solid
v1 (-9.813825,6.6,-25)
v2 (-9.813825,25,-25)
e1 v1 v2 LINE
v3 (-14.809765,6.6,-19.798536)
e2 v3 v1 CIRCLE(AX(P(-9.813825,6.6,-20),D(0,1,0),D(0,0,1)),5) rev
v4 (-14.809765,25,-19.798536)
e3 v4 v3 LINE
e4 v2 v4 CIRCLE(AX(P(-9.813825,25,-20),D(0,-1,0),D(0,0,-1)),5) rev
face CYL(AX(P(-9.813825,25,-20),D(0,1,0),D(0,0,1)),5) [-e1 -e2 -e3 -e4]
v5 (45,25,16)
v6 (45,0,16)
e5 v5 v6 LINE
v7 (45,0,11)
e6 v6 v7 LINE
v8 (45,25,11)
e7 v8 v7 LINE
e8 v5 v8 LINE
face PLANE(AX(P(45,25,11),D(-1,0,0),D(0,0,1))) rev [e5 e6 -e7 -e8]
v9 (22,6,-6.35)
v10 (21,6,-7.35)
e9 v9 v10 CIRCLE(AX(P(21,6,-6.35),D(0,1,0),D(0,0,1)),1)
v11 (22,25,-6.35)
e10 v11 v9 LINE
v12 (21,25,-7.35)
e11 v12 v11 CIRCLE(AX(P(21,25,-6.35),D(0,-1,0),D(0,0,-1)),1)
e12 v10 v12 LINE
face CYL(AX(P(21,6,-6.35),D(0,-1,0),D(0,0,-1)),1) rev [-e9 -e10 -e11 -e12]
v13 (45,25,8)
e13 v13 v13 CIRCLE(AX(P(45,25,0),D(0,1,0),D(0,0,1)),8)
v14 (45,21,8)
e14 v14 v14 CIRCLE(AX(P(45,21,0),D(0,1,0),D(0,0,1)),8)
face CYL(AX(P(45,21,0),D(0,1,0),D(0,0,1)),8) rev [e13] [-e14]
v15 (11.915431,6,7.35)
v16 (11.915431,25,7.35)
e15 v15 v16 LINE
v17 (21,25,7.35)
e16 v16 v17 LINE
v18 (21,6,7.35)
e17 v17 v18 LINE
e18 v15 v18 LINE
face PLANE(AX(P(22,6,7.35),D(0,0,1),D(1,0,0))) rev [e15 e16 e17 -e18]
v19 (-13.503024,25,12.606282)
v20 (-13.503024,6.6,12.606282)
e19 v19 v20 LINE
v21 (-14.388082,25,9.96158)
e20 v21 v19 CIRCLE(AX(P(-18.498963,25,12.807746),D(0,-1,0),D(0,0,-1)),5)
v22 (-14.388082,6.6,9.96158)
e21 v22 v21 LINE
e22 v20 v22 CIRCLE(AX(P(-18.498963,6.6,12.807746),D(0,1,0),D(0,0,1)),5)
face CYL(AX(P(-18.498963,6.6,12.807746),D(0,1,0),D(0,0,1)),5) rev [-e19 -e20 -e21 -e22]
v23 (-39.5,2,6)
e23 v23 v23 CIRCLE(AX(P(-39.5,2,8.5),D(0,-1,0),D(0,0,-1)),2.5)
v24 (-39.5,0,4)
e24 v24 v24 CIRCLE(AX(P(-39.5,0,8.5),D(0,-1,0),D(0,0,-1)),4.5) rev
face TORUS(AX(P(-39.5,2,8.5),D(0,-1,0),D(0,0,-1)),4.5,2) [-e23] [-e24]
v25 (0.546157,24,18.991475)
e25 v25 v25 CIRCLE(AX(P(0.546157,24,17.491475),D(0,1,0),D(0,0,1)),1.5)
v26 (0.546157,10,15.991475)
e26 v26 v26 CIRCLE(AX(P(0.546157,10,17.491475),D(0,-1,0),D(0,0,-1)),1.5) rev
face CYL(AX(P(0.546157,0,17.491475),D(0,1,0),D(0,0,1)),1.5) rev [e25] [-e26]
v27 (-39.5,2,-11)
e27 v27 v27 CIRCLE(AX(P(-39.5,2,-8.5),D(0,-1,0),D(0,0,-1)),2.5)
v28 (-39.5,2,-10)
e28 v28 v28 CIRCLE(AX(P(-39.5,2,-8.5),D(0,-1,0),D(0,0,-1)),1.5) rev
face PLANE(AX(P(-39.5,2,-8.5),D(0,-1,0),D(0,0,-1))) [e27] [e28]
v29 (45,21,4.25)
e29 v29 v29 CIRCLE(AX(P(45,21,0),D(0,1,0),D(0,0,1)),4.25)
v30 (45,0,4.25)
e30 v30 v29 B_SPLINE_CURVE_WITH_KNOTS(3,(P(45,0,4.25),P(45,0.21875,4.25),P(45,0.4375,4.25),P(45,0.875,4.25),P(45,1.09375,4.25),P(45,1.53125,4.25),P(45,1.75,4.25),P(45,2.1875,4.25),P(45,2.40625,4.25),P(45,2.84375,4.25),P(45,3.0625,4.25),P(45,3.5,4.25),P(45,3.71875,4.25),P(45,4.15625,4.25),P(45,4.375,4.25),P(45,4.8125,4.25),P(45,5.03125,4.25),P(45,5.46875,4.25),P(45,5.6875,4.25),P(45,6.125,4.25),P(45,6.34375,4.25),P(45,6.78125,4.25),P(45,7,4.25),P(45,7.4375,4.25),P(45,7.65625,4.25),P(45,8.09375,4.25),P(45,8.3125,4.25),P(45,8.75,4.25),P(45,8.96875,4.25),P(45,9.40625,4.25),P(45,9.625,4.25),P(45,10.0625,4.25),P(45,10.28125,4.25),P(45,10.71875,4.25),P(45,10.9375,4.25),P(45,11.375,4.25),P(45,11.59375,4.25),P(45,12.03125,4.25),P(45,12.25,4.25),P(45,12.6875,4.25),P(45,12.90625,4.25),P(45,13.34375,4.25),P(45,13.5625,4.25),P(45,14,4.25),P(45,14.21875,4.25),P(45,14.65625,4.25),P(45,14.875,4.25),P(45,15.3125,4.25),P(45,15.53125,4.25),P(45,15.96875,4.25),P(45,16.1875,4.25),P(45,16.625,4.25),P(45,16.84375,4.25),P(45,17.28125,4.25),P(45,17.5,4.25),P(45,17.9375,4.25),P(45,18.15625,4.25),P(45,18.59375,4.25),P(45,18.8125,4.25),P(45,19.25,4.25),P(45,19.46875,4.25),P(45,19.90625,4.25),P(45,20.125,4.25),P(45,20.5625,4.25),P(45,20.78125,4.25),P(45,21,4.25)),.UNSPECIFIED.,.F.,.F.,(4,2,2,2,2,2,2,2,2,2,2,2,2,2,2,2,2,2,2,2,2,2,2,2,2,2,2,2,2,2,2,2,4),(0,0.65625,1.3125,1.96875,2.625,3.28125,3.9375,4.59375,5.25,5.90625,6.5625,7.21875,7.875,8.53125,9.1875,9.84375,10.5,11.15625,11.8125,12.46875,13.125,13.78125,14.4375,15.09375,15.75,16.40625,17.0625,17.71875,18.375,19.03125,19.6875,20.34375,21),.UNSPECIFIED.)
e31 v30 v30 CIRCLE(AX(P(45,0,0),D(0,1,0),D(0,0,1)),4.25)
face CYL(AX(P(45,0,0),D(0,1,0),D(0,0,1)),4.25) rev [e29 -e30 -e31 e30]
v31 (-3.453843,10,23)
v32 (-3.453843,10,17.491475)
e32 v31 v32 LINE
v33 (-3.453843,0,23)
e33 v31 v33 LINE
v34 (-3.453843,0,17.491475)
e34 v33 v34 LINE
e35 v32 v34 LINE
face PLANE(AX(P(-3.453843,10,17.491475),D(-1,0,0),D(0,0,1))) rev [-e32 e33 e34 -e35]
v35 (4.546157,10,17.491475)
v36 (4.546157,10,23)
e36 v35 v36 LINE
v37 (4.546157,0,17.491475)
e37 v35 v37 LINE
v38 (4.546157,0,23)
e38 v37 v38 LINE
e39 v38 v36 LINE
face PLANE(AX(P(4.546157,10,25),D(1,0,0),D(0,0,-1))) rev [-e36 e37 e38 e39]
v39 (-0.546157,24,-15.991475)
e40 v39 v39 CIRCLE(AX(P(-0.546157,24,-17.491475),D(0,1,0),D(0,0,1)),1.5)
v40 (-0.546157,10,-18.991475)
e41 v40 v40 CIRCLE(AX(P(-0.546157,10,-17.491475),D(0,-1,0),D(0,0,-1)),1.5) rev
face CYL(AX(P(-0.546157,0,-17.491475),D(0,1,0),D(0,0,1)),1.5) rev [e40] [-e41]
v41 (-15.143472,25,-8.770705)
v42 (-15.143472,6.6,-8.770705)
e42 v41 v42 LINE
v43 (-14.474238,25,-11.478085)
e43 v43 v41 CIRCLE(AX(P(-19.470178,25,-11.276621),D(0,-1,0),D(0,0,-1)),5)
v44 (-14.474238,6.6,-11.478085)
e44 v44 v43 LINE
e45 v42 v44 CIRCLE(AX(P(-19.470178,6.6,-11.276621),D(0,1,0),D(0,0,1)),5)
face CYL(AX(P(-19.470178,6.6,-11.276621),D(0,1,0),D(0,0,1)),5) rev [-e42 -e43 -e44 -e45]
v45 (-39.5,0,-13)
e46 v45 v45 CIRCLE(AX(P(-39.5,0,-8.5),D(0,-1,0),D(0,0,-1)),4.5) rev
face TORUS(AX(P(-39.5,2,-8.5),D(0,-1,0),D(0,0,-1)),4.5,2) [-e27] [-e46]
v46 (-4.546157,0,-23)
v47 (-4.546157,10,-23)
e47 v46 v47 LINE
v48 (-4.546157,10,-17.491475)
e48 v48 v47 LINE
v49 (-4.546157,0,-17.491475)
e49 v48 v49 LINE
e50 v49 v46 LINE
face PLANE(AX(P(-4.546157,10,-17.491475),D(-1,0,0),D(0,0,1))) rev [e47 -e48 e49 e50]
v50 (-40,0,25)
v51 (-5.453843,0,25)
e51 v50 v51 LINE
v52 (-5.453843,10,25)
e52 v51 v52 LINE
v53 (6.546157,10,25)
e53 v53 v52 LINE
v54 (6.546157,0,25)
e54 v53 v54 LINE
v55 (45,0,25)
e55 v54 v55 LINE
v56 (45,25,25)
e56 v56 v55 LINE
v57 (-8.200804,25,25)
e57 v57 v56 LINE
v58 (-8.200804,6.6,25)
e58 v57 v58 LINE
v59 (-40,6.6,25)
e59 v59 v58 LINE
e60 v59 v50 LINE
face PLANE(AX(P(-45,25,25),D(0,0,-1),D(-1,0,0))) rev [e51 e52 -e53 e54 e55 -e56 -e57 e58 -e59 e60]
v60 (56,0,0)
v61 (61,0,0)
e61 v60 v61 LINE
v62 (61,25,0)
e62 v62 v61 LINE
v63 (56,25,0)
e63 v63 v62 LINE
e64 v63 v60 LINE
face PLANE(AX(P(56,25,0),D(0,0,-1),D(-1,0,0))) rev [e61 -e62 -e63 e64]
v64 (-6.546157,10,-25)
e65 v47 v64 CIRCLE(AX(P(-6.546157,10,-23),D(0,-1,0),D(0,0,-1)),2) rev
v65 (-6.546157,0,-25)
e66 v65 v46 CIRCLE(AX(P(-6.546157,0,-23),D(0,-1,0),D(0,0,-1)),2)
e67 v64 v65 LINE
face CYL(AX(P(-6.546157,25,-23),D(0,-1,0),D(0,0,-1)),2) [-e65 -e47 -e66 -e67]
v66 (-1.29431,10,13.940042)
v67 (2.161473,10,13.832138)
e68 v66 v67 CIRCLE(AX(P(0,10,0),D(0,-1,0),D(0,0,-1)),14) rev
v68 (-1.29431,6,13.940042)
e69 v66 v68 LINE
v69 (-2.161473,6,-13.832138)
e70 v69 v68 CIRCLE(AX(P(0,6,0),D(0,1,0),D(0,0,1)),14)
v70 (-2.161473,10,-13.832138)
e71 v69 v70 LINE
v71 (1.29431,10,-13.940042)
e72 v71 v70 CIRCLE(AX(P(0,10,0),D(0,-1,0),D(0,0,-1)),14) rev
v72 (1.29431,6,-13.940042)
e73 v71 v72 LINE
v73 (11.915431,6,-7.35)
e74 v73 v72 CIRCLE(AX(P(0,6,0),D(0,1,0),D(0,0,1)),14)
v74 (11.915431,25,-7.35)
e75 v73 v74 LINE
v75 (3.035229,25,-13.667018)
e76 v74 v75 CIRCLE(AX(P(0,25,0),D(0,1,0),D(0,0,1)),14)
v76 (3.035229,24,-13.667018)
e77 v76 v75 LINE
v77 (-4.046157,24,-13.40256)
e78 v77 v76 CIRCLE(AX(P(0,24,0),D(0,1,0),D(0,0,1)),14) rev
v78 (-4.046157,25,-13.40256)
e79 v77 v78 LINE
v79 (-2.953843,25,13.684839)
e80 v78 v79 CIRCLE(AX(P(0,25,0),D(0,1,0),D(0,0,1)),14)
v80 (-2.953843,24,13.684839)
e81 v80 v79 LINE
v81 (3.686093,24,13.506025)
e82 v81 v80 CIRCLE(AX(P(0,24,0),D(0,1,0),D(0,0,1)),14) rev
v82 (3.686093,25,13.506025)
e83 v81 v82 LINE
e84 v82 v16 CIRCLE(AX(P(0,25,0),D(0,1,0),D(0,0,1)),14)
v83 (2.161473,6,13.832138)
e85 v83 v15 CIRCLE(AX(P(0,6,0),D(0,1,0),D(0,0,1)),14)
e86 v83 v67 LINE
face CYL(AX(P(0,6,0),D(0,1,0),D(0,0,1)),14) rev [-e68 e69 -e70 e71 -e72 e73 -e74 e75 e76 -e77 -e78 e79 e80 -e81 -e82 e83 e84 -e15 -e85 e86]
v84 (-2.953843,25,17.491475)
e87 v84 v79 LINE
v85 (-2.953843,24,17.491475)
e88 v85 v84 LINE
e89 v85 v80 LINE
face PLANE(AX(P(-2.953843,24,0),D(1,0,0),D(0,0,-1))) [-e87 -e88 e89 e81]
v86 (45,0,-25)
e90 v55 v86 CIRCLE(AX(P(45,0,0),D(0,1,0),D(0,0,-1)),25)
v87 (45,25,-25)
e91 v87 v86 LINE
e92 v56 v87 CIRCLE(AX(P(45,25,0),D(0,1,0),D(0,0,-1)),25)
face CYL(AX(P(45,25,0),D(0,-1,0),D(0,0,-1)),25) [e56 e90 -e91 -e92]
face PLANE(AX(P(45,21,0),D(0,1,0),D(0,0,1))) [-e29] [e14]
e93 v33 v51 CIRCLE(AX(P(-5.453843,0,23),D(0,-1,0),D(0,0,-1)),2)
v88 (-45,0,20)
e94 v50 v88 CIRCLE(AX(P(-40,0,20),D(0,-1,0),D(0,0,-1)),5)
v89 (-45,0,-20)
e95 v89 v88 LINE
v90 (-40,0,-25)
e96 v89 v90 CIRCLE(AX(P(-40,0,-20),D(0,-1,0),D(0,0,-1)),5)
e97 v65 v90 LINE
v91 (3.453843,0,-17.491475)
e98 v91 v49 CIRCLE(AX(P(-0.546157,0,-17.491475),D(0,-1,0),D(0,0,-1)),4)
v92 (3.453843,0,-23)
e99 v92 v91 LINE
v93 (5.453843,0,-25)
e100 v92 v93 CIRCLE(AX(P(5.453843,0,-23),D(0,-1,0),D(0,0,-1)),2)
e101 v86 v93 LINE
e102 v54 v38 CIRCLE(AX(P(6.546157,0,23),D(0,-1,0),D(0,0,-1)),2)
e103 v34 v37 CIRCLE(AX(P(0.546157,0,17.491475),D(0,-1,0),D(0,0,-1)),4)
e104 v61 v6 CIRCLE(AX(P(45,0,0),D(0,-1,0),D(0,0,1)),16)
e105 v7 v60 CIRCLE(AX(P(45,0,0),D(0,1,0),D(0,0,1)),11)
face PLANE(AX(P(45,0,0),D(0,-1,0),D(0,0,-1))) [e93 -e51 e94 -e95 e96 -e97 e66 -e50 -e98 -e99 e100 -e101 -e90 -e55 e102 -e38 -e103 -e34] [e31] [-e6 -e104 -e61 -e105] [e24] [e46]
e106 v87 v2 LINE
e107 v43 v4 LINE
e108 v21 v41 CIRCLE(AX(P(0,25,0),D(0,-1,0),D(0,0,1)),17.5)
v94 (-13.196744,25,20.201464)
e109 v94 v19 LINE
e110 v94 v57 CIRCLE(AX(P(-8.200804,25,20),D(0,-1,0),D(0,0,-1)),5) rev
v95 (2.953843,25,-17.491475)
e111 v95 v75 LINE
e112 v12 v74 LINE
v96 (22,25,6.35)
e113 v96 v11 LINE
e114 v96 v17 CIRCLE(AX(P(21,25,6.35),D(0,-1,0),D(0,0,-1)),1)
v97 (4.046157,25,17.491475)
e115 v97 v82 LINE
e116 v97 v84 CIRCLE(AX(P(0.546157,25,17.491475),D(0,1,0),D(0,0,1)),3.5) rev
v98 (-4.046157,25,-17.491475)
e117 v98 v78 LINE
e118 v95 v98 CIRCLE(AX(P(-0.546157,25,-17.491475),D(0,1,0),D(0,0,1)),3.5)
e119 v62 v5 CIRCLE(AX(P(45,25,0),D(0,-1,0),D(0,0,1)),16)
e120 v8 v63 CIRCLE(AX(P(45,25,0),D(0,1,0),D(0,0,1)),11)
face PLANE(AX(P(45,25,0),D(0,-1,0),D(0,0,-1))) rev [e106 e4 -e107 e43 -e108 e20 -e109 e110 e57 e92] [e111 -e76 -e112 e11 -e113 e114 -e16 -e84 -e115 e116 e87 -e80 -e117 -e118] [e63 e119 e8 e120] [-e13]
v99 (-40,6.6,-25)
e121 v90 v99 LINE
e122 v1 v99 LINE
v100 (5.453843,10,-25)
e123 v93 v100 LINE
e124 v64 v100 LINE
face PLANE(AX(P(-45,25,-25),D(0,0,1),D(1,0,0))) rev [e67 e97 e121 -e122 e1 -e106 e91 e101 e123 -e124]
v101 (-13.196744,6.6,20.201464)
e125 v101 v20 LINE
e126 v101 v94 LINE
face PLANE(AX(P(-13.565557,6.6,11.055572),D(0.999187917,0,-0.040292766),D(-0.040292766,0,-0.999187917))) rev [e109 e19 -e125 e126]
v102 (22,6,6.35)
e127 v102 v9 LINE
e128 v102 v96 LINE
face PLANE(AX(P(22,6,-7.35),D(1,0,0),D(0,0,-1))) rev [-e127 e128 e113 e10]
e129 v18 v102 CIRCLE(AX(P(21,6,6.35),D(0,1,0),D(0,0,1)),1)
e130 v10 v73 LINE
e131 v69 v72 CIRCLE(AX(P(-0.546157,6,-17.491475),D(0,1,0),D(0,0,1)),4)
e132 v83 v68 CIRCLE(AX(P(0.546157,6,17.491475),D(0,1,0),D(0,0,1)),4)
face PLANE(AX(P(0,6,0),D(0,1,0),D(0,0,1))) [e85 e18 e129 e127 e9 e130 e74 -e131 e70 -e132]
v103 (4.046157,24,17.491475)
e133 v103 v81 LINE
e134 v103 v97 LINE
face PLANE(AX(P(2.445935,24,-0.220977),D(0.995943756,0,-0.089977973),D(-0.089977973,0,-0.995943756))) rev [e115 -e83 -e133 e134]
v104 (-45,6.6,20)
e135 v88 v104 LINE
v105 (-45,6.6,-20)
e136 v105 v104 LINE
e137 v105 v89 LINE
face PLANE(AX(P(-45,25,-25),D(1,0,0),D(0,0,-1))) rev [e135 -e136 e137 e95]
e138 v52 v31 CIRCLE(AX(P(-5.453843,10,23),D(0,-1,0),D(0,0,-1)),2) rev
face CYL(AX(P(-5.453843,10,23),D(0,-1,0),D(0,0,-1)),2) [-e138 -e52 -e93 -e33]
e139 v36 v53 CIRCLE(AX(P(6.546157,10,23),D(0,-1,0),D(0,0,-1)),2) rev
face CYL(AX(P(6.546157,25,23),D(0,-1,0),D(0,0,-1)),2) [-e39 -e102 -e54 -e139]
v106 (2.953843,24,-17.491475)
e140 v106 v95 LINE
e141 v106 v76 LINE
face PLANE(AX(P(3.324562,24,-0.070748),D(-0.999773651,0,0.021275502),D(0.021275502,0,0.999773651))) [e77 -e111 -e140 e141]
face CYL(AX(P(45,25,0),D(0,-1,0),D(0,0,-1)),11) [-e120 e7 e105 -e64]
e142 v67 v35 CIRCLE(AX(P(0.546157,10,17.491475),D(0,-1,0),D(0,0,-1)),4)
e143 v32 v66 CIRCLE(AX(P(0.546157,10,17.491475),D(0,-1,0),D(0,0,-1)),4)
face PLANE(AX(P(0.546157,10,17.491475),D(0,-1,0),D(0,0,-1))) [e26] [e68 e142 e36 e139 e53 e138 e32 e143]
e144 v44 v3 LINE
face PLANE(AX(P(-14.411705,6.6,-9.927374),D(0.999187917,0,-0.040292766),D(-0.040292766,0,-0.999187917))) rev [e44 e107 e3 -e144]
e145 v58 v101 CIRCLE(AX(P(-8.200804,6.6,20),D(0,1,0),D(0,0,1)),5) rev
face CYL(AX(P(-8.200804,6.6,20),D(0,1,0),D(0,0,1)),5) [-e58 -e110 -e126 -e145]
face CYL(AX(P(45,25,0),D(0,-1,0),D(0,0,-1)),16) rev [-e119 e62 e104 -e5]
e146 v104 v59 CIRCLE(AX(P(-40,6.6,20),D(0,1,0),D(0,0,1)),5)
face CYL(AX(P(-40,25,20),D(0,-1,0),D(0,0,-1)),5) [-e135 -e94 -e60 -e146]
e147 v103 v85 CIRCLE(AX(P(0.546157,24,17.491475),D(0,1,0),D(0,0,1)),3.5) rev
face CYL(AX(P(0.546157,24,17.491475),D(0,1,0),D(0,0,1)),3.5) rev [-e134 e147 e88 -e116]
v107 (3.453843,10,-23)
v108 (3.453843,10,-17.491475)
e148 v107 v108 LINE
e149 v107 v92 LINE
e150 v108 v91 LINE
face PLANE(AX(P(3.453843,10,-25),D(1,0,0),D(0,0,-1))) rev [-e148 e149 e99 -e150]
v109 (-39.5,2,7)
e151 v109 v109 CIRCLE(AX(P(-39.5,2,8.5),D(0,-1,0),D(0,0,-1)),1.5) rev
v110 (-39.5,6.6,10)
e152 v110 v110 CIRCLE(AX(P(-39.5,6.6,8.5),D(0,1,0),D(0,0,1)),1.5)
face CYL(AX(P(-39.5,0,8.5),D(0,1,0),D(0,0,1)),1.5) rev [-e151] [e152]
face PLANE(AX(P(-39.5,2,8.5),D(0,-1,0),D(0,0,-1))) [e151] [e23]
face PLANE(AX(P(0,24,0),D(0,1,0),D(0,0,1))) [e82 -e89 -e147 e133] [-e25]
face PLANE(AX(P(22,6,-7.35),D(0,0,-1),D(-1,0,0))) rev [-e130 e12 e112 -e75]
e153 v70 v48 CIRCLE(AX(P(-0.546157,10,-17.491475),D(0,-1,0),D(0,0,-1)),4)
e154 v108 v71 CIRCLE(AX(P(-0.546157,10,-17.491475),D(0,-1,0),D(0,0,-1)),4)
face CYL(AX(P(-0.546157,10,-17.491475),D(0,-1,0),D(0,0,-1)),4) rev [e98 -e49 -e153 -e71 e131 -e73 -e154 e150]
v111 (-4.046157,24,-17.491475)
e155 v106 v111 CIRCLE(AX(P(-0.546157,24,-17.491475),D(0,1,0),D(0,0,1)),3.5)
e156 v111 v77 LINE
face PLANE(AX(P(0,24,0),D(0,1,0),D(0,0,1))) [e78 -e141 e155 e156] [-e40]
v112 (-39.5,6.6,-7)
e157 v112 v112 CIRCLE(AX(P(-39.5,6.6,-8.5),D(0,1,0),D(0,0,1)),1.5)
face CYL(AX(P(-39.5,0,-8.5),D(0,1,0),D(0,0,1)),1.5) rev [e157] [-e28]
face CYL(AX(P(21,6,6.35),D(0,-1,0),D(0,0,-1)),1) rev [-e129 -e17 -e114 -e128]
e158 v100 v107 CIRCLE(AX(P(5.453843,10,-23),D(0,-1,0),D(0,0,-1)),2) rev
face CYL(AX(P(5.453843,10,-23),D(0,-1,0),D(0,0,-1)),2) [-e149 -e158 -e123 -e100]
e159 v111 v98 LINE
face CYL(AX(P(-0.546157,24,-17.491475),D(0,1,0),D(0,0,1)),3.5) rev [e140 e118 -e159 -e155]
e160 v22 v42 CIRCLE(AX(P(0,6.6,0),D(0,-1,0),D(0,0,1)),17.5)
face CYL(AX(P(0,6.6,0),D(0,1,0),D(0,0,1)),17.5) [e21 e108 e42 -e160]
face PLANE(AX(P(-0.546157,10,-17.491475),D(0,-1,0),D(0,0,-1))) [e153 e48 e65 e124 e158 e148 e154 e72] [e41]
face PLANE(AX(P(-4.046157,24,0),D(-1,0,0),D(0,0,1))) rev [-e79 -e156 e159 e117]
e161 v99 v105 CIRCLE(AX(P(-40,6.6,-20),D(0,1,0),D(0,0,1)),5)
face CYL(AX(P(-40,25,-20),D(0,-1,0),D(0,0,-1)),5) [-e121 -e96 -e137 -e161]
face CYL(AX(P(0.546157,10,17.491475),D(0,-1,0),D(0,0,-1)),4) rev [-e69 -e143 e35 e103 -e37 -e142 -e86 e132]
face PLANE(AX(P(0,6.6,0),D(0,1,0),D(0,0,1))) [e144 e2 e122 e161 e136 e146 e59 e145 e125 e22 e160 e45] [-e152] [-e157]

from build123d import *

# Parameters (mm, degrees)
BOSS_EXTRUDE1_DEPTH = 25
SKETCH2_R           = 14
CUT_EXTRUDE1_DEPTH  = 19
CUT_EXTRUDE2_DEPTH  = 1
SKETCH4_R           = 1.5
CUT_EXTRUDE3_DEPTH  = 79.108898341
SKETCH5_R           = 1.5
CUT_EXTRUDE4_DEPTH  = 79.108898341
CUT_EXTRUDE7_DEPTH  = 19
FILLET1_R           = 1
CUT_EXTRUDE8_DEPTH  = 18.4
FILLET2_R           = 5
SKETCH8_R           = 1.5
CUT_EXTRUDE9_DEPTH  = 77.573885888
SKETCH9_R           = 2.5
CUT_EXTRUDE10_DEPTH = 2
FILLET3_R           = 2
CUT_EXTRUDE11_DEPTH = 10
FILLET4_R           = 2
SKETCH11_R          = 8
CUT_EXTRUDE12_DEPTH = 4
SKETCH12_R          = 4.25
CUT_EXTRUDE13_DEPTH = 78.239886096
CUT_EXTRUDE16_DEPTH = 25


with BuildPart() as part:
    # Sketch1 → Boss-Extrude1 (new body)
    with BuildSketch(Plane(origin=(0, 0, 0), x_dir=(1, 0, 0), z_dir=(0, 1, 0))):
        with BuildLine():
            Line((-45, 25), (45, 25))
            ThreePointArc((45, 25), (70, 0), (45, -25))
            Line((45, -25), (-45, -25))
            Line((-45, -25), (-45, 25))
        make_face()
    extrude(amount=BOSS_EXTRUDE1_DEPTH)

    # Sketch2 → Cut-Extrude1 (cut)
    with BuildSketch(Plane(origin=(0, 25, 0), x_dir=(1, 0, 0), z_dir=(0, 1, 0))):
        with Locations(Location((0, 0, 0), (0, 0, 270))):
            Circle(SKETCH2_R)
    extrude(amount=-CUT_EXTRUDE1_DEPTH, mode=Mode.SUBTRACT)

    # Sketch3 → Cut-Extrude2 (cut)
    with BuildSketch(Plane(origin=(0, 25, 0), x_dir=(1, 0, 0), z_dir=(0, 1, 0))):
        with BuildLine():
            ThreePointArc((2.953843371, 17.491475436), (-0.546156629, 20.991475436), (-4.046156629, 17.491475436))
            Line((-4.046156629, 17.491475436), (-4.046156629, 13.402560074))
            ThreePointArc((-4.046156629, 13.402560074), (-0.522473122, 13.990247383), (3.035229041, 13.667018134))
            Line((3.035229041, 13.667018134), (2.953843371, 17.491475436))
        make_face()
        with BuildLine():
            Line((-2.953843371, -13.684838667), (-2.953843371, -17.491475436))
            ThreePointArc((-2.953843371, -17.491475436), (0.546156629, -20.991475436), (4.046156629, -17.491475436))
            Line((4.046156629, -17.491475436), (3.686093385, -13.506025158))
            ThreePointArc((3.686093385, -13.506025158), (0.376883388, -13.994926185), (-2.953843371, -13.684838667))
        make_face()
    extrude(amount=-CUT_EXTRUDE2_DEPTH, mode=Mode.SUBTRACT)

    # Sketch4 → Cut-Extrude3 (cut, through all)
    with BuildSketch(Plane(origin=(0, 24, 0), x_dir=(1, 0, 0), z_dir=(0, 1, 0))):
        with Locations(Location((-0.546156629, 17.491475436, 0), (0, 0, 270))):
            Circle(SKETCH4_R)
    extrude(amount=-CUT_EXTRUDE3_DEPTH, mode=Mode.SUBTRACT)

    # Sketch5 → Cut-Extrude4 (cut, through all)
    with BuildSketch(Plane(origin=(0, 24, 0), x_dir=(1, 0, 0), z_dir=(0, 1, 0))):
        with Locations(Location((0.546156629, -17.491475436, 0), (0, 0, 270))):
            Circle(SKETCH5_R)
    extrude(amount=-CUT_EXTRUDE4_DEPTH, mode=Mode.SUBTRACT)

    # Sketch6 → Cut-Extrude7 (cut)
    with BuildSketch(Plane(origin=(0, 25, 0), x_dir=(1, 0, 0), z_dir=(0, 1, 0))):
        with BuildLine():
            Line((22, 7.35), (22, -7.35))
            Line((22, -7.35), (11.915431171, -7.35))
            Line((11.915431171, -7.35), (11.920287143, -7.342121929))
            ThreePointArc((11.920287143, -7.342121929), (13.999999235, 0.004627215), (11.915431171, 7.35))
            Line((11.915431171, 7.35), (22, 7.35))
        make_face()
    extrude(amount=-CUT_EXTRUDE7_DEPTH, mode=Mode.SUBTRACT)

    # Fillet1
    fillet1_edges = [part.edges().sort_by_distance(p)[0] for p in [
        (22, 15.5, 7.35),
        (22, 15.5, -7.35),
    ]]
    fillet(fillet1_edges, radius=FILLET1_R)

    # Sketch7 → Cut-Extrude8 (cut)
    with BuildSketch(Plane(origin=(0, 25, 0), x_dir=(1, 0, 0), z_dir=(0, 1, 0))):
        with BuildLine():
            Line((-14.411704874, 9.927374408), (-15.019516237, 25))
            Line((-15.019516237, 25), (-45, 25))
            Line((-45, 25), (-45, -25))
            Line((-45, -25), (-13.003240573, -25))
            Line((-13.003240573, -25), (-13.565556796, -11.055571845))
            ThreePointArc((-13.565556796, -11.055571845), (-17.485788544, -0.705123398), (-14.411704874, 9.927374408))
        make_face()
    extrude(amount=-CUT_EXTRUDE8_DEPTH, mode=Mode.SUBTRACT)

    # Fillet2
    fillet2_edges = [part.edges().sort_by_distance(p)[0] for p in [
        (-45, 3.3, 25),
        (-45, 3.3, -25),
        (-14.411704874, 15.8, -9.927374408),
        (-13.565556796, 15.8, 11.055571845),
        (-13.003240573, 15.8, 25),
        (-15.019516237, 15.8, -25),
    ]]
    fillet(fillet2_edges, radius=FILLET2_R)

    # Sketch8 → Cut-Extrude9 (cut, through all)
    with BuildSketch(Plane(origin=(0, 6.6, 0), x_dir=(1, 0, 0), z_dir=(0, 1, 0))):
        with Locations(Location((-39.5, 8.5, 0), (0, 0, 270))):
            Circle(SKETCH8_R)
        with Locations(Location((-39.5, -8.5, 0), (0, 0, 270))):
            Circle(SKETCH8_R)
    extrude(amount=-CUT_EXTRUDE9_DEPTH, mode=Mode.SUBTRACT)

    # Sketch9 → Cut-Extrude10 (cut)
    with BuildSketch(Plane.XZ):
        with Locations(Location((-39.5, 8.5, 0), (0, 0, 270))):
            Circle(SKETCH9_R)
        with Locations(Location((-39.5, -8.5, 0), (0, 0, 270))):
            Circle(SKETCH9_R)
    extrude(amount=-CUT_EXTRUDE10_DEPTH, mode=Mode.SUBTRACT)

    # Fillet3
    fillet3_edges = [part.edges().sort_by_distance(p)[0] for p in [
        (-39.5, 0, 11),
        (-39.5, 0, -6),
    ]]
    fillet(fillet3_edges, radius=FILLET3_R - 0.0001)  # a hair under: the kernel refuses the full size

    # Sketch10 → Cut-Extrude11 (cut)
    with BuildSketch(Plane.XZ):
        with BuildLine():
            Line((-3.453843371, 17.491475436), (-3.453843371, 25))
            Line((-3.453843371, 25), (4.546156629, 25))
            Line((4.546156629, 25), (4.546156629, 17.491475436))
            ThreePointArc((4.546156629, 17.491475436), (0.546156629, 13.491475436), (-3.453843371, 17.491475436))
        make_face()
        with BuildLine():
            Line((-4.546156629, -17.491475436), (-4.546156629, -25))
            Line((-4.546156629, -25), (3.453843371, -25))
            Line((3.453843371, -25), (3.453843371, -17.491475436))
            ThreePointArc((3.453843371, -17.491475436), (-0.546156629, -13.491475436), (-4.546156629, -17.491475436))
        make_face()
    extrude(amount=-CUT_EXTRUDE11_DEPTH, mode=Mode.SUBTRACT)

    # Fillet4
    fillet4_edges = [part.edges().sort_by_distance(p)[0] for p in [
        (-3.453843371, 5, 25),
        (4.546156629, 5, 25),
        (3.453843371, 5, -25),
        (-4.546156629, 5, -25),
    ]]
    fillet(fillet4_edges, radius=FILLET4_R)

    # Sketch11 → Cut-Extrude12 (cut)
    with BuildSketch(Plane(origin=(0, 25, 0), x_dir=(1, 0, 0), z_dir=(0, 1, 0))):
        with Locations(Location((45, 0, 0), (0, 0, 270))):
            Circle(SKETCH11_R)
    extrude(amount=-CUT_EXTRUDE12_DEPTH, mode=Mode.SUBTRACT)

    # Sketch12 → Cut-Extrude13 (cut, through all)
    with BuildSketch(Plane(origin=(0, 21, 0), x_dir=(1, 0, 0), z_dir=(0, 1, 0))):
        with Locations(Location((45, 0, 0), (0, 0, 270))):
            Circle(SKETCH12_R)
    extrude(amount=-CUT_EXTRUDE13_DEPTH, mode=Mode.SUBTRACT)

    # Sketch19 → Cut-Extrude16 (cut)
    with BuildSketch(Plane.XZ):
        with BuildLine():
            Line((45, 11), (45, 16))
            ThreePointArc((45, 16), (56.313708499, 11.313708499), (61, 0))
            Line((61, 0), (56, 0))
            ThreePointArc((56, 0), (52.778174593, 7.778174593), (45, 11))
        make_face()
    extrude(amount=-CUT_EXTRUDE16_DEPTH, mode=Mode.SUBTRACT)


solid = part.part
